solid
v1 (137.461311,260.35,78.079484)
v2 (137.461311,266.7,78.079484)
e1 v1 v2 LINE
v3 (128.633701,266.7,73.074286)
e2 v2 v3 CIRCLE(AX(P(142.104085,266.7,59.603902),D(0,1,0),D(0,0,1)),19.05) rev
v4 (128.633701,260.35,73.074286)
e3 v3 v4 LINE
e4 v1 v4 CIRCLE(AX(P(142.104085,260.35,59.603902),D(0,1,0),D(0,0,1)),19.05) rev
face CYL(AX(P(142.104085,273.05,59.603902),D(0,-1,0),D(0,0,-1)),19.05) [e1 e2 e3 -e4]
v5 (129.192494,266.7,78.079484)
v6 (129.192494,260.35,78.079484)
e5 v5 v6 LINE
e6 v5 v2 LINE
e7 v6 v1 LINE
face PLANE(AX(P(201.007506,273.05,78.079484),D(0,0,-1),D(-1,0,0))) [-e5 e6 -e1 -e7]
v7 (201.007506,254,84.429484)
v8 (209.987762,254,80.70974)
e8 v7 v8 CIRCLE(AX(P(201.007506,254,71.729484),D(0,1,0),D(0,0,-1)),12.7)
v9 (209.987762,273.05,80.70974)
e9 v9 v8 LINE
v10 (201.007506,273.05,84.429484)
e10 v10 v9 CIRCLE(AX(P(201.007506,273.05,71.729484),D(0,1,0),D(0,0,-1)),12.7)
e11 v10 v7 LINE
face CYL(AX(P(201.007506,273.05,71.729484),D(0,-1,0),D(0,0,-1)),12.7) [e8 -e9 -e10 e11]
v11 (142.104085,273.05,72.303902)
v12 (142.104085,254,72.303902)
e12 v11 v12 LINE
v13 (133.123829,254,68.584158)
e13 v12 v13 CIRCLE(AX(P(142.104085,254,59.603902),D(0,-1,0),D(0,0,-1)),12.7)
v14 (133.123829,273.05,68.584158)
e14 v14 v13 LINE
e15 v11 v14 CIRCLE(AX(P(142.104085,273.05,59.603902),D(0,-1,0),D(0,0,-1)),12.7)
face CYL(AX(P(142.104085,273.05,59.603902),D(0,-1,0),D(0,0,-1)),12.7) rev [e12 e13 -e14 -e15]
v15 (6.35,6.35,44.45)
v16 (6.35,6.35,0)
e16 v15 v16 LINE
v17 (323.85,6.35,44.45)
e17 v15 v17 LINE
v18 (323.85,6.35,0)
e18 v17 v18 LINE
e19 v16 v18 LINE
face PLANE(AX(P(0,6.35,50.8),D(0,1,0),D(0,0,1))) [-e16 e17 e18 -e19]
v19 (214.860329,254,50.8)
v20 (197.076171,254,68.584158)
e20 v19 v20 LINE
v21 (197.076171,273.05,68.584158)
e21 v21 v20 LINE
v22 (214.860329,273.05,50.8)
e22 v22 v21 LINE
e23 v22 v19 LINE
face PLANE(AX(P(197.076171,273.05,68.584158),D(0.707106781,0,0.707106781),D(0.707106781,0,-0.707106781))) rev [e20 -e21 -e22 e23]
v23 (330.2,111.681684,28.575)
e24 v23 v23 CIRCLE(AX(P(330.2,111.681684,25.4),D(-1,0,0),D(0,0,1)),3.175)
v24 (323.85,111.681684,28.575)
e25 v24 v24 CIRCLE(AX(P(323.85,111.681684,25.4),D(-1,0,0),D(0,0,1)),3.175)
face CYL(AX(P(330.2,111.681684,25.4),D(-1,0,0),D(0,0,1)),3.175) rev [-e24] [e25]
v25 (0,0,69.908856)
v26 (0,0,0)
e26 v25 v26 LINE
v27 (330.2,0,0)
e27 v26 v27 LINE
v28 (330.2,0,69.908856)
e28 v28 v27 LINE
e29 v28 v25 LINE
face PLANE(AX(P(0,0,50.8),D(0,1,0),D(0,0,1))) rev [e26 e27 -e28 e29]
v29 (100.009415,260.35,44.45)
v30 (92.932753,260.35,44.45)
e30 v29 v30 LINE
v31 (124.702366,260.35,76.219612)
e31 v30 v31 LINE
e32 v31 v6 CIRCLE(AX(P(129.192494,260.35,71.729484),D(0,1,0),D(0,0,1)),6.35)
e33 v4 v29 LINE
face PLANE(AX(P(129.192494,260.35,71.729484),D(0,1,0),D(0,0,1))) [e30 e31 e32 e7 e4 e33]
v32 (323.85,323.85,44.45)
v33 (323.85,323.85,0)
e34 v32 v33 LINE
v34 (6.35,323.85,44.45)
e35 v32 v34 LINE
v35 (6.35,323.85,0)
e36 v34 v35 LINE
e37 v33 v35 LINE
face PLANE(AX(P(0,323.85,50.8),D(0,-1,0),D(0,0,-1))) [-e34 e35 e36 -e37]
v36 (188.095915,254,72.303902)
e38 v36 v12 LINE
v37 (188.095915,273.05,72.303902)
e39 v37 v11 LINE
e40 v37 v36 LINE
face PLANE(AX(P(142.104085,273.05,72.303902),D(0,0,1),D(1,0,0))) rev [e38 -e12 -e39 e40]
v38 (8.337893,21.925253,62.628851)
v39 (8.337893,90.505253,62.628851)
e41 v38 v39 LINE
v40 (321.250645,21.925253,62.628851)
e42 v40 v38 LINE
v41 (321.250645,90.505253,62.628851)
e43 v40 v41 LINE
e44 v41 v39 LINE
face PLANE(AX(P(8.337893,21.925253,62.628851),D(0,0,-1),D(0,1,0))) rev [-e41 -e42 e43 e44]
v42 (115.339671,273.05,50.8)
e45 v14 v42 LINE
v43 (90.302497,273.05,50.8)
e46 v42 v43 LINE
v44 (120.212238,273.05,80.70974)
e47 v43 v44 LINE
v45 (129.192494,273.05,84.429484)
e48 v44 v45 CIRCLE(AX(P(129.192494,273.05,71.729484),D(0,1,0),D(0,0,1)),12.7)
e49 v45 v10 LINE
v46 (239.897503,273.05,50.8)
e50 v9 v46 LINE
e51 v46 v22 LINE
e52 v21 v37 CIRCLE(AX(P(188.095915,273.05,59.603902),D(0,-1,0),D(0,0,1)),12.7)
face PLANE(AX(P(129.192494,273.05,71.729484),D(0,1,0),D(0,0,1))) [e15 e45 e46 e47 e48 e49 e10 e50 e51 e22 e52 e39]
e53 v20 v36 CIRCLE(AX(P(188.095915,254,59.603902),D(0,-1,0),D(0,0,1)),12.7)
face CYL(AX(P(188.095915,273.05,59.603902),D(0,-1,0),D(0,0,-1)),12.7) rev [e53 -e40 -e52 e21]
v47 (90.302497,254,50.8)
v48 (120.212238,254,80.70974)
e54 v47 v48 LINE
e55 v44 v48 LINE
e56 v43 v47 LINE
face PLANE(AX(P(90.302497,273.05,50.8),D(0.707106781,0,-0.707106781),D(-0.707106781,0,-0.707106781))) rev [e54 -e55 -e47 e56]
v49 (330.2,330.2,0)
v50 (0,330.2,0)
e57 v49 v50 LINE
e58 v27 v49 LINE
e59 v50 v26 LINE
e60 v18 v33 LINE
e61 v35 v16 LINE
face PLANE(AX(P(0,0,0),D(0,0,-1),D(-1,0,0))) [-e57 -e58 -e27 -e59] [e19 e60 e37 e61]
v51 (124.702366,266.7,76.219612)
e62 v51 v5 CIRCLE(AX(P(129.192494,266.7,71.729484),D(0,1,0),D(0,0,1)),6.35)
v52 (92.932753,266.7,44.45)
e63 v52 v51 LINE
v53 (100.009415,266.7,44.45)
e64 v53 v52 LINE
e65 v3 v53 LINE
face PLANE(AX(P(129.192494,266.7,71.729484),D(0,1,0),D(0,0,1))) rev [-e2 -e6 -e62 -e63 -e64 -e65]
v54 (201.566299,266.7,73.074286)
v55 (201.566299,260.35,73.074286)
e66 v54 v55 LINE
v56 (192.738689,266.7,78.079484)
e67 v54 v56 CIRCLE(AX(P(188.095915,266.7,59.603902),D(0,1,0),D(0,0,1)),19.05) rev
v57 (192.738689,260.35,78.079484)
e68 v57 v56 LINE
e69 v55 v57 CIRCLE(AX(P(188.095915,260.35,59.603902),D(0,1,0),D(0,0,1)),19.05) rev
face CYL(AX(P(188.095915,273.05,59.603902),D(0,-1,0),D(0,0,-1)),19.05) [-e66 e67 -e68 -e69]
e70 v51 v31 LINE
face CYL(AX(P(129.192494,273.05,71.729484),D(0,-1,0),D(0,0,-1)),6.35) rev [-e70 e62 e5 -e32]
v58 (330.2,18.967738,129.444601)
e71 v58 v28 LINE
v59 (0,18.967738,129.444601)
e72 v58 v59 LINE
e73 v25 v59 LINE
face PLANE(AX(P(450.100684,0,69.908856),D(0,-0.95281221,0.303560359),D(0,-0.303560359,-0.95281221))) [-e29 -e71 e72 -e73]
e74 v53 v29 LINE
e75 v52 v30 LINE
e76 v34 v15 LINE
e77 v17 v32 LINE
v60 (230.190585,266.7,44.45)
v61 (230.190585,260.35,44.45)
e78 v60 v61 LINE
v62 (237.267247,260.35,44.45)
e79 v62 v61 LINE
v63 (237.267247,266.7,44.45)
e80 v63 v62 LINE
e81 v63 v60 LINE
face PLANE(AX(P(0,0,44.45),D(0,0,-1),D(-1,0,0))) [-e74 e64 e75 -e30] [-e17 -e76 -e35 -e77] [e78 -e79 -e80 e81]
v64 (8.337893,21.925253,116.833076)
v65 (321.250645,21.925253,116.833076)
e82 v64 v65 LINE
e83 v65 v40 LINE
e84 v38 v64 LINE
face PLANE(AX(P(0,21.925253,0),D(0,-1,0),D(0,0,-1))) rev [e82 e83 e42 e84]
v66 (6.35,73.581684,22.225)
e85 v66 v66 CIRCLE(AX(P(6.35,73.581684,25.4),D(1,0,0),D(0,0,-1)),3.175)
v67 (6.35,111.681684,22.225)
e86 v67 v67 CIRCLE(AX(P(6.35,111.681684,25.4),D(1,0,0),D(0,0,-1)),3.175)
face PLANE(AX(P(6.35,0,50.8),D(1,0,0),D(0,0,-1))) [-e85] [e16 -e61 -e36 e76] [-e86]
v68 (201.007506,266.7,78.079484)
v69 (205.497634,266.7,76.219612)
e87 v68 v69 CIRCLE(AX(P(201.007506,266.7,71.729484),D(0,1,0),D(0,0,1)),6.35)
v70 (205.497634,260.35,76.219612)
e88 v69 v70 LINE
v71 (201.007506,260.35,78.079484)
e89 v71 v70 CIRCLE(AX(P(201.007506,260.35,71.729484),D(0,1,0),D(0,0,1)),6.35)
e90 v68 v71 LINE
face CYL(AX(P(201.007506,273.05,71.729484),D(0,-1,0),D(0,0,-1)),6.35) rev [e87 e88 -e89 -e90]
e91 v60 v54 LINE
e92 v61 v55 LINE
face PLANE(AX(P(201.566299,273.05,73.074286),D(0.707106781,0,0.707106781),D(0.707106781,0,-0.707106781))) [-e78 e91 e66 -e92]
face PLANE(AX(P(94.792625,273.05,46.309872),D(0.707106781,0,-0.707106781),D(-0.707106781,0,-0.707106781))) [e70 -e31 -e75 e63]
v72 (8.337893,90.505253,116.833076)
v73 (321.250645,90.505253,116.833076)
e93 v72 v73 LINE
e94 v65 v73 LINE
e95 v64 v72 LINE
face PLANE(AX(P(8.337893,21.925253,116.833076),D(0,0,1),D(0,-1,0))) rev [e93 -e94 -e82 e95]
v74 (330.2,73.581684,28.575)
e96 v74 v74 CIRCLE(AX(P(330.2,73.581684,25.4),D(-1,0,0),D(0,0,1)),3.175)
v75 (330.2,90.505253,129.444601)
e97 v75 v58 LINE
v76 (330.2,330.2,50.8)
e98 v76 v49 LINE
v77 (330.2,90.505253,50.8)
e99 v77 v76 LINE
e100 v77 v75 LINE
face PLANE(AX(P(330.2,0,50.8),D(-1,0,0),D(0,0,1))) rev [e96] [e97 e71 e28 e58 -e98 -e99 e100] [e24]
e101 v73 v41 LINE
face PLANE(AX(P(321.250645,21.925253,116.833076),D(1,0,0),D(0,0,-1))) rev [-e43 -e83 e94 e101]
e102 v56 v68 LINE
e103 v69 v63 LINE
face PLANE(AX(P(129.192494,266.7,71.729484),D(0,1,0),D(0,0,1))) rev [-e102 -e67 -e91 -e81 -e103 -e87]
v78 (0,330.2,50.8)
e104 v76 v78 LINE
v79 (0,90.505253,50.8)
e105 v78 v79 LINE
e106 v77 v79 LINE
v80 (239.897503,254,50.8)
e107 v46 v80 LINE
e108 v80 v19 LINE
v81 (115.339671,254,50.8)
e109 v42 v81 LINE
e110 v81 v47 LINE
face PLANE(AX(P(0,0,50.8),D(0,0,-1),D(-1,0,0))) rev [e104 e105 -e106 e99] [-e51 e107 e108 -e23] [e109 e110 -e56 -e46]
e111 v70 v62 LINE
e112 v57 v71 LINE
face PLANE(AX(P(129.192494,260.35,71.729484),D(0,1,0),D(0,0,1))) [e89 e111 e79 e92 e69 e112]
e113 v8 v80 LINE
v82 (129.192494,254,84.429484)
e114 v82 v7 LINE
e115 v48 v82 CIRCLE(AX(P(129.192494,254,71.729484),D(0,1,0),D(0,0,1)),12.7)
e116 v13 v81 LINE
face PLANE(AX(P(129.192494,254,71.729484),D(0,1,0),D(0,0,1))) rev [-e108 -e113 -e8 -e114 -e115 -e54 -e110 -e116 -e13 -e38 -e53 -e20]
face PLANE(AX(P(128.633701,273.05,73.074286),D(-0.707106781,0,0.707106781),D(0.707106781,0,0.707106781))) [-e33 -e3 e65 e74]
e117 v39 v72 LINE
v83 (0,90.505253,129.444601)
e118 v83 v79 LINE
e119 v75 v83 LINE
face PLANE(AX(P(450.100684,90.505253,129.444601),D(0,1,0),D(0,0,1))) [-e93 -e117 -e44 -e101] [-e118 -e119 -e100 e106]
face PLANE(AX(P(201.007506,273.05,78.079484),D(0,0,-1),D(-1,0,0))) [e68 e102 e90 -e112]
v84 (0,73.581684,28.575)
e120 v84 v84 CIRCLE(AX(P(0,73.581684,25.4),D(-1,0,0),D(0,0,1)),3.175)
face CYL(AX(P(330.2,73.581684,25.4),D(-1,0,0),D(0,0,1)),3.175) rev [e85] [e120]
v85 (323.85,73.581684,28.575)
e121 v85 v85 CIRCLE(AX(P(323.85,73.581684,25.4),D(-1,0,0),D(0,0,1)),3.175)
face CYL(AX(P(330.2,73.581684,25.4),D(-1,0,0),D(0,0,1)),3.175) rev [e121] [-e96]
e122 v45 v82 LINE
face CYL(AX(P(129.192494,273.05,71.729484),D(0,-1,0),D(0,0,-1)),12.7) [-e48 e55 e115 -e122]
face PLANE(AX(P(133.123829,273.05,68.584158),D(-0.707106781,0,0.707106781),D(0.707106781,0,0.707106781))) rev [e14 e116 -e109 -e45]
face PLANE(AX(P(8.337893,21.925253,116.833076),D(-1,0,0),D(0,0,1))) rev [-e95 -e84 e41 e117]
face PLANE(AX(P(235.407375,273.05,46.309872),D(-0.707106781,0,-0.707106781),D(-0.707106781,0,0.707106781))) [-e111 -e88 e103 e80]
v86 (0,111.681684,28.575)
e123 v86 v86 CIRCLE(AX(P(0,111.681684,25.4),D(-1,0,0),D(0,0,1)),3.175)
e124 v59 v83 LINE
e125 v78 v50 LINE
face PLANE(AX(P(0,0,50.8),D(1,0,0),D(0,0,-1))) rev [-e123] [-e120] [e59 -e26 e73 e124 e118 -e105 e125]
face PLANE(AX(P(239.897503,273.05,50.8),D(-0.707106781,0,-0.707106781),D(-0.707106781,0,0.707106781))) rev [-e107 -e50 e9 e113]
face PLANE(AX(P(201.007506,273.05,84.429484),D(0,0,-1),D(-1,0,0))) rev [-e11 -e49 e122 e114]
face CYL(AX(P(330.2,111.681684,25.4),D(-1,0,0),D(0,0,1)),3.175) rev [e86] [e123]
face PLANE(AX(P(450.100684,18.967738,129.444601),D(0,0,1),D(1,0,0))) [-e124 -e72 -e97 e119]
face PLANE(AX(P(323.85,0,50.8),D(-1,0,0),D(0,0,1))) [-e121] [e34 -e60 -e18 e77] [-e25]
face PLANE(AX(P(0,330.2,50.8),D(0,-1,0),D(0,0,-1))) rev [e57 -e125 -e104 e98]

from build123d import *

# Parameters (mm, degrees)
SKETCH1_W           = 330.2
SKETCH1_H           = 330.2
BOSS_EXTRUDE1_DEPTH = 50.8
BOSS_EXTRUDE2_START = 254
BOSS_EXTRUDE2_DEPTH = 19.05
SHELL1_START        = 6.35
SHELL1_OUTLINE_W    = 317.5
SHELL1_OUTLINE_H    = 44.45
SHELL1_DEPTH        = 317.5
SHELL1_START_2      = 260.35
SHELL1_2_DEPTH      = 6.35
SKETCH3_R           = 3.175
CUT_EXTRUDE1_DEPTH  = 475.544431862
BOSS_EXTRUDE3_DEPTH = 330.2
SKETCH5_W           = 312.91275174
SKETCH5_H           = 54.204225569
CUT_EXTRUDE2_DEPTH  = 68.58


# Read off the part's stored shape, not the designer's step: Shell1
with BuildPart() as part:
    # Sketch1 → Boss-Extrude1 (new body)
    with BuildSketch(Plane.XY):
        with Locations((165.1, 165.1)):
            Rectangle(SKETCH1_W, SKETCH1_H)
    extrude(amount=BOSS_EXTRUDE1_DEPTH)

    # Sketch2 → Boss-Extrude2 (add)
    with BuildSketch(Plane(origin=(0, 0, 0), x_dir=(1, 0, 0), z_dir=(0, 1, 0)).offset(BOSS_EXTRUDE2_START)):
        with BuildLine():
            Line((142.104085231, -72.303901903), (188.095914769, -72.303901903))
            ThreePointArc((188.095914769, -72.303901903), (192.95599436, -71.337171966), (197.07617089, -68.584158024))
            Line((197.07617089, -68.584158024), (214.860328914, -50.8))
            Line((214.860328914, -50.8), (239.897502761, -50.8))
            Line((239.897502761, -50.8), (209.987762385, -80.709740376))
            ThreePointArc((209.987762385, -80.709740376), (205.867585855, -83.462754317), (201.007506264, -84.429484254))
            Line((201.007506264, -84.429484254), (129.192493736, -84.429484254))
            ThreePointArc((129.192493736, -84.429484254), (124.332414145, -83.462754317), (120.212237615, -80.709740376))
            Line((120.212237615, -80.709740376), (90.302497239, -50.8))
            Line((90.302497239, -50.8), (115.339671086, -50.8))
            Line((115.339671086, -50.8), (133.12382911, -68.584158024))
            ThreePointArc((133.12382911, -68.584158024), (137.24400564, -71.337171966), (142.104085231, -72.303901903))
        make_face()
    extrude(amount=BOSS_EXTRUDE2_DEPTH)

    # Shell1 outline → Shell1 (cut)
    with BuildSketch(Plane(origin=(0, 0, 0), x_dir=(1, 0, 0), z_dir=(0, 1, 0)).offset(SHELL1_START)):
        with Locations((165.1, -22.225)):
            Rectangle(SHELL1_OUTLINE_W, SHELL1_OUTLINE_H)
    extrude(amount=SHELL1_DEPTH, mode=Mode.SUBTRACT)

    # Shell1 2 outline → Shell1 2 (cut)
    with BuildSketch(Plane(origin=(0, 0, 0), x_dir=(1, 0, 0), z_dir=(0, 1, 0)).offset(SHELL1_START_2)):
        with BuildLine():
            Line((192.738689455, -78.079484254), (201.007506264, -78.079484254))
            ThreePointArc((201.007506264, -78.079484254), (203.43754606, -77.596119286), (205.497634325, -76.219612315))
            Line((205.497634325, -76.219612315), (237.26724664, -44.45))
            Line((237.26724664, -44.45), (230.190585035, -44.45))
            Line((230.190585035, -44.45), (201.56629895, -73.074286085))
            ThreePointArc((201.56629895, -73.074286085), (197.491905042, -76.1755001), (192.738689455, -78.079484254))
        make_face()
        with BuildLine():
            Line((128.63370105, -73.074286085), (100.009414965, -44.45))
            Line((100.009414965, -44.45), (92.93275336, -44.45))
            Line((92.93275336, -44.45), (124.702365675, -76.219612315))
            ThreePointArc((124.702365675, -76.219612315), (126.76245394, -77.596119286), (129.192493736, -78.079484254))
            Line((129.192493736, -78.079484254), (137.461310545, -78.079484254))
            ThreePointArc((137.461310545, -78.079484254), (132.708094958, -76.1755001), (128.63370105, -73.074286085))
        make_face()
    extrude(amount=SHELL1_2_DEPTH, mode=Mode.SUBTRACT)

    # Sketch3 → Cut-Extrude1 (cut, through all)
    with BuildSketch(Plane.ZY):
        with Locations((25.4, 111.6816843)):
            Circle(SKETCH3_R)
        with Locations((25.4, 73.5816843)):
            Circle(SKETCH3_R)
    extrude(amount=-CUT_EXTRUDE1_DEPTH, mode=Mode.SUBTRACT)

    # Sketch4 → Boss-Extrude3 (add)
    with BuildSketch(Plane.ZY):
        Polygon((50.8, 0), (69.908855574, 0), (129.44460093, 18.967737852), (129.44460093, 90.50525308), (50.8, 90.50525308), align=None)
    extrude(amount=-BOSS_EXTRUDE3_DEPTH)

    # Sketch5 → Cut-Extrude2 (cut)
    with BuildSketch(Plane(origin=(0, 90.50525308, 0), x_dir=(1, 0, 0), z_dir=(0, 1, 0))):
        with Locations((164.794269249, -89.730963472)):
            Rectangle(SKETCH5_W, SKETCH5_H)
    extrude(amount=-CUT_EXTRUDE2_DEPTH, mode=Mode.SUBTRACT)


solid = part.part
